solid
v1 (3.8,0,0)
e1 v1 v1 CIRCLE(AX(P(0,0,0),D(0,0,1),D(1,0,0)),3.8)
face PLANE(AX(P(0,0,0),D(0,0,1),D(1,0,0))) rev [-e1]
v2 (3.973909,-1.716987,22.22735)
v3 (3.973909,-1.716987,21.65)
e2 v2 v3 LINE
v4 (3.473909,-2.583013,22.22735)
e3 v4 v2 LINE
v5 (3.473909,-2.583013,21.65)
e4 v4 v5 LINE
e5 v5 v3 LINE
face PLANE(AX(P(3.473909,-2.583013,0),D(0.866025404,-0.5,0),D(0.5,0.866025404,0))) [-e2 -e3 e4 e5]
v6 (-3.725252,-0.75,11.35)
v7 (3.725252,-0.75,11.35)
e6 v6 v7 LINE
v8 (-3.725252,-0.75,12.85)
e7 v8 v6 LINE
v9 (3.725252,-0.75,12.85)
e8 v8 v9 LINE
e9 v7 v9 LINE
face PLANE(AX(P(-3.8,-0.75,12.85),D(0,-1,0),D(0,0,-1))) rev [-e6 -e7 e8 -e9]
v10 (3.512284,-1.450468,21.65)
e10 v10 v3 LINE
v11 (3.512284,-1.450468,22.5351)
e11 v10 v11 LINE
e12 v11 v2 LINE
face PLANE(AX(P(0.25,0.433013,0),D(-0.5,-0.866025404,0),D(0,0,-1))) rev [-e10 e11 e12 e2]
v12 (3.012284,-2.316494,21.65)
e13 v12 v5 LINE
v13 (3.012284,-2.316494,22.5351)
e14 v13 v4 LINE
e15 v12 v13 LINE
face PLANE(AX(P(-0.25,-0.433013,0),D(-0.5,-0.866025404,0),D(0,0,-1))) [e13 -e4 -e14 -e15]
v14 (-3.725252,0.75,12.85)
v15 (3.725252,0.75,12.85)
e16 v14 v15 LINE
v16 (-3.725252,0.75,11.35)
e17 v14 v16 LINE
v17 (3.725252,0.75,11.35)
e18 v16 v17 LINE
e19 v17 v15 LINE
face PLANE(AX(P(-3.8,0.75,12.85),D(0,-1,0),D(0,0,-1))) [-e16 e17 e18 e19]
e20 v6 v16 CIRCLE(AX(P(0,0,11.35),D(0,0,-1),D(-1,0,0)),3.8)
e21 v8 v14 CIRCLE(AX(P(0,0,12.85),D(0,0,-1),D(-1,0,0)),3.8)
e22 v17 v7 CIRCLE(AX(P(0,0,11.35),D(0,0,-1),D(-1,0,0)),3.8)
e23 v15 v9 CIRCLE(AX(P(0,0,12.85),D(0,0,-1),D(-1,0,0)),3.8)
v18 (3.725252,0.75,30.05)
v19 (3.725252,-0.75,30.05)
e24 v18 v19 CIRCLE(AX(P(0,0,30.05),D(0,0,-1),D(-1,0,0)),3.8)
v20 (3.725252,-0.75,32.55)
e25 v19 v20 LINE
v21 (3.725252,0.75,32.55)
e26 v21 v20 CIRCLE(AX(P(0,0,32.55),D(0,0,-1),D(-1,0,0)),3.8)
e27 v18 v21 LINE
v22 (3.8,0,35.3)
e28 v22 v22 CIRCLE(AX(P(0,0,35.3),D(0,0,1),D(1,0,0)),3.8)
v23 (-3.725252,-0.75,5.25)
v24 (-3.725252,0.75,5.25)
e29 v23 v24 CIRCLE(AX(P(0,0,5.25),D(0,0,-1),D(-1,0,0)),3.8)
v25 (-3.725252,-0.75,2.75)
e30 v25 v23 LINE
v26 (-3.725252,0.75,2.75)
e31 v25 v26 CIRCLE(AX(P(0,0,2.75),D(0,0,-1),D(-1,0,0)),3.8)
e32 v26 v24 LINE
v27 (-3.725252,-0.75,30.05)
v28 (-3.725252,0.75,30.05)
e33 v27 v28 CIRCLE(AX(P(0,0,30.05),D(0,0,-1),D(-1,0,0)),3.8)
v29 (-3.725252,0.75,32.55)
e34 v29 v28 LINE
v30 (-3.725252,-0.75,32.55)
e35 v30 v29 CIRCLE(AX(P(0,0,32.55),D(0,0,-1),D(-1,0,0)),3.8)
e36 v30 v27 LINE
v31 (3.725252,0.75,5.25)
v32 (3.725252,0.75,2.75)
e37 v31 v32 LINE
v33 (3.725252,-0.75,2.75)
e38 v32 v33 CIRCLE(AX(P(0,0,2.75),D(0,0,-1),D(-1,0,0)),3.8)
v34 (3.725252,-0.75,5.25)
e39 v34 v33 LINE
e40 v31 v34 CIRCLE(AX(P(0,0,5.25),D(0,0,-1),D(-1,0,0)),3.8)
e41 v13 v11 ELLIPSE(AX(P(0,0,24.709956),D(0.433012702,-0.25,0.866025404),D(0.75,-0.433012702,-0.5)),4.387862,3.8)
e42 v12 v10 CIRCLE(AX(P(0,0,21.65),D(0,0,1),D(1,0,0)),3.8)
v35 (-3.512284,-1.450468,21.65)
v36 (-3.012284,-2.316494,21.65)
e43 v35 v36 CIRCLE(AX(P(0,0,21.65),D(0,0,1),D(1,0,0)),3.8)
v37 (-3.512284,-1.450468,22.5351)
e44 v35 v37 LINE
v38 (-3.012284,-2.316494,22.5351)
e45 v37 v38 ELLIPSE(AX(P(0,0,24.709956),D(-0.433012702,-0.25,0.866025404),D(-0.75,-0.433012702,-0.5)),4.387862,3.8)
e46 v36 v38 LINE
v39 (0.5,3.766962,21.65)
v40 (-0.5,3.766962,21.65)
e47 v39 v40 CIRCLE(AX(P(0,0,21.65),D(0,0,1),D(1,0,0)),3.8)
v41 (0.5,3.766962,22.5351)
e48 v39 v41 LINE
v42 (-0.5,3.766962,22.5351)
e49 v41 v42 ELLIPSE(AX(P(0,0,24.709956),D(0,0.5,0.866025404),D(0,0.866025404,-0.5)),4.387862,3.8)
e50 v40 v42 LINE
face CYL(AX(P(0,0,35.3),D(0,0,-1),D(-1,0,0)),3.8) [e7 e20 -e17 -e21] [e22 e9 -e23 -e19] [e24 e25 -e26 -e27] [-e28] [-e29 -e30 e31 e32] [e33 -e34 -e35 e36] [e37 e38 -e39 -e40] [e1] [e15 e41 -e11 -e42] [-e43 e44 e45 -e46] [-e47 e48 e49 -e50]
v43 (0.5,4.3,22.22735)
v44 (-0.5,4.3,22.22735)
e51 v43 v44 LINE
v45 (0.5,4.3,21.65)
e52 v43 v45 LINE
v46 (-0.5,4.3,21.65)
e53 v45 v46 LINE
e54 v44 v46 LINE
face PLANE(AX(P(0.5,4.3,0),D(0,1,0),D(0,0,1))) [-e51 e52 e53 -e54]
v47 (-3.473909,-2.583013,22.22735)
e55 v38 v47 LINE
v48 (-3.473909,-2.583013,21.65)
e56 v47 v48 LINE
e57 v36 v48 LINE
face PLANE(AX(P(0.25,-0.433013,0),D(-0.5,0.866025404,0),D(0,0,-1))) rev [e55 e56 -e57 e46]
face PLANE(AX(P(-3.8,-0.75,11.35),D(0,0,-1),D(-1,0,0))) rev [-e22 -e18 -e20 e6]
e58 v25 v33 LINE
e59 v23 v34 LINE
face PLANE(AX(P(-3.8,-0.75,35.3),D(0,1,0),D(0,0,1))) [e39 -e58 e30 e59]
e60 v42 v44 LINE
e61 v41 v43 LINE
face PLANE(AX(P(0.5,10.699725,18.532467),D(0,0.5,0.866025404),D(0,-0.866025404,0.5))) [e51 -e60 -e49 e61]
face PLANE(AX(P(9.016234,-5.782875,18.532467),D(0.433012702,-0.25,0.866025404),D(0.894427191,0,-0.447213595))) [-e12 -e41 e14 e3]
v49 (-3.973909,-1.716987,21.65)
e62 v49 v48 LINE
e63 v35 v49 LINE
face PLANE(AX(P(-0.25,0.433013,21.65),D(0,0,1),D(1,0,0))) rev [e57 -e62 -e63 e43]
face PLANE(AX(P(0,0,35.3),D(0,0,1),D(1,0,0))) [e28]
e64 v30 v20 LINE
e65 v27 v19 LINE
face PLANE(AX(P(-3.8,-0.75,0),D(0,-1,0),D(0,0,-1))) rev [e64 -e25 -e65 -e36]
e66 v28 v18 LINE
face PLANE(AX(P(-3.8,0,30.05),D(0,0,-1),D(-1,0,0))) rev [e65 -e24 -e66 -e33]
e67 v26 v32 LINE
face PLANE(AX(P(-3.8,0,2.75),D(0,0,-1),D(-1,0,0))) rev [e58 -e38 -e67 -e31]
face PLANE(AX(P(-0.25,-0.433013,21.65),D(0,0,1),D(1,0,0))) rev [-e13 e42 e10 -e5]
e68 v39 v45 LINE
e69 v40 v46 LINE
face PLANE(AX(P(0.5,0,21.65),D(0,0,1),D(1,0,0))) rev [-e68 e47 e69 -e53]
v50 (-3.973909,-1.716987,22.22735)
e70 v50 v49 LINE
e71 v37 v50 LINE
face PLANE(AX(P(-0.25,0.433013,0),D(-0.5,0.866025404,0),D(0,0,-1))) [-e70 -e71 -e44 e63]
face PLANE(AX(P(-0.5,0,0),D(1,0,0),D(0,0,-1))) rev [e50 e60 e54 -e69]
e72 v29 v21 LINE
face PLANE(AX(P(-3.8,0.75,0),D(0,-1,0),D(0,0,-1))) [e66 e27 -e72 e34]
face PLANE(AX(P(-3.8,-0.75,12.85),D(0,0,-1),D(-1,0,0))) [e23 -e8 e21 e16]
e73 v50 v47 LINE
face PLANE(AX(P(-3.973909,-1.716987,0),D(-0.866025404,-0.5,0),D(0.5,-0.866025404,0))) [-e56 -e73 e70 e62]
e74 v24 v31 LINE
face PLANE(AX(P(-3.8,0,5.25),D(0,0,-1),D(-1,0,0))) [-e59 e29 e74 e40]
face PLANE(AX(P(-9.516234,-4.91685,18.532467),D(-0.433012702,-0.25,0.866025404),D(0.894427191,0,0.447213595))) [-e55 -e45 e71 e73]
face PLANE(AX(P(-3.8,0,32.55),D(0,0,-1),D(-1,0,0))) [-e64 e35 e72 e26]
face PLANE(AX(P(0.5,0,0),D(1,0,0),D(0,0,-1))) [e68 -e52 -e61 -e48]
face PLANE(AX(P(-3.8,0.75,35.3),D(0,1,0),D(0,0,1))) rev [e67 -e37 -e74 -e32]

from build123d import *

# Parameters (mm, degrees)
SKETCH1_R               = 3.8
BOSS_EXTRUDE1_DEPTH     = 35.3
SKETCH3_W               = 2.5
SKETCH3_H               = 1.5
CUT_EXTRUDE2_DEPTH      = 36.706722056
CUT_EXTRUDE3_DEPTH      = 36.706722056
CUT_EXTRUDE3_DEPTH_BACK = 36.706722056
SKETCH6_W               = 1.5
SKETCH6_H               = 1.5
BOSS_EXTRUDE2_DEPTH     = 0.5
CIRPATTERN1_COUNT       = 3


with BuildPart() as part:
    # Sketch1 → Boss-Extrude1 (new body)
    with BuildSketch(Plane.XY):
        Circle(SKETCH1_R)
    extrude(amount=BOSS_EXTRUDE1_DEPTH)

    # Sketch3 → Cut-Extrude2 (cut, symmetric)
    with BuildSketch(Plane(origin=(0, 0, 0), x_dir=(0, 0, -1), z_dir=(1, 0, 0))):
        with Locations((-31.3, 0)):
            Rectangle(SKETCH3_W, SKETCH3_H)
    cut_extrude2 = extrude(amount=CUT_EXTRUDE2_DEPTH, both=True, mode=Mode.SUBTRACT)

    # Mirror1: Cut-Extrude2 across plane
    add(cut_extrude2.mirror(Plane.XY.offset(17.65)), mode=Mode.SUBTRACT)

    # Sketch6 → Cut-Extrude3 (cut, two sides: drawn at the far end of the back side and taken through both)
    with BuildSketch(Plane(origin=(0, 0, 0), x_dir=(0, 0, -1), z_dir=(1, 0, 0)).offset(-CUT_EXTRUDE3_DEPTH_BACK)):
        with Locations((-12.1, 0)):
            Rectangle(SKETCH6_W, SKETCH6_H)
    extrude(amount=CUT_EXTRUDE3_DEPTH + CUT_EXTRUDE3_DEPTH_BACK, mode=Mode.SUBTRACT)

    # Sketch7 → Boss-Extrude2 (add, symmetric)
    with BuildSketch(Plane(origin=(0, 0, 0), x_dir=(0, 0, -1), z_dir=(1, 0, 0))):
        Polygon((-22.227350269, 4.3), (-22.804700538, 3.3), (-21.65, 3.3), (-21.65, 4.3), align=None)
    boss_extrude2 = extrude(amount=BOSS_EXTRUDE2_DEPTH, both=True)

    # CirPattern1: Boss-Extrude2 ×3 about axis
    cirpattern1_axis = Axis((0, 0, 0), (0, 0, 1))
    for i in range(1, CIRPATTERN1_COUNT):
        add(boss_extrude2.rotate(cirpattern1_axis, i * 360 / CIRPATTERN1_COUNT))


solid = part.part
